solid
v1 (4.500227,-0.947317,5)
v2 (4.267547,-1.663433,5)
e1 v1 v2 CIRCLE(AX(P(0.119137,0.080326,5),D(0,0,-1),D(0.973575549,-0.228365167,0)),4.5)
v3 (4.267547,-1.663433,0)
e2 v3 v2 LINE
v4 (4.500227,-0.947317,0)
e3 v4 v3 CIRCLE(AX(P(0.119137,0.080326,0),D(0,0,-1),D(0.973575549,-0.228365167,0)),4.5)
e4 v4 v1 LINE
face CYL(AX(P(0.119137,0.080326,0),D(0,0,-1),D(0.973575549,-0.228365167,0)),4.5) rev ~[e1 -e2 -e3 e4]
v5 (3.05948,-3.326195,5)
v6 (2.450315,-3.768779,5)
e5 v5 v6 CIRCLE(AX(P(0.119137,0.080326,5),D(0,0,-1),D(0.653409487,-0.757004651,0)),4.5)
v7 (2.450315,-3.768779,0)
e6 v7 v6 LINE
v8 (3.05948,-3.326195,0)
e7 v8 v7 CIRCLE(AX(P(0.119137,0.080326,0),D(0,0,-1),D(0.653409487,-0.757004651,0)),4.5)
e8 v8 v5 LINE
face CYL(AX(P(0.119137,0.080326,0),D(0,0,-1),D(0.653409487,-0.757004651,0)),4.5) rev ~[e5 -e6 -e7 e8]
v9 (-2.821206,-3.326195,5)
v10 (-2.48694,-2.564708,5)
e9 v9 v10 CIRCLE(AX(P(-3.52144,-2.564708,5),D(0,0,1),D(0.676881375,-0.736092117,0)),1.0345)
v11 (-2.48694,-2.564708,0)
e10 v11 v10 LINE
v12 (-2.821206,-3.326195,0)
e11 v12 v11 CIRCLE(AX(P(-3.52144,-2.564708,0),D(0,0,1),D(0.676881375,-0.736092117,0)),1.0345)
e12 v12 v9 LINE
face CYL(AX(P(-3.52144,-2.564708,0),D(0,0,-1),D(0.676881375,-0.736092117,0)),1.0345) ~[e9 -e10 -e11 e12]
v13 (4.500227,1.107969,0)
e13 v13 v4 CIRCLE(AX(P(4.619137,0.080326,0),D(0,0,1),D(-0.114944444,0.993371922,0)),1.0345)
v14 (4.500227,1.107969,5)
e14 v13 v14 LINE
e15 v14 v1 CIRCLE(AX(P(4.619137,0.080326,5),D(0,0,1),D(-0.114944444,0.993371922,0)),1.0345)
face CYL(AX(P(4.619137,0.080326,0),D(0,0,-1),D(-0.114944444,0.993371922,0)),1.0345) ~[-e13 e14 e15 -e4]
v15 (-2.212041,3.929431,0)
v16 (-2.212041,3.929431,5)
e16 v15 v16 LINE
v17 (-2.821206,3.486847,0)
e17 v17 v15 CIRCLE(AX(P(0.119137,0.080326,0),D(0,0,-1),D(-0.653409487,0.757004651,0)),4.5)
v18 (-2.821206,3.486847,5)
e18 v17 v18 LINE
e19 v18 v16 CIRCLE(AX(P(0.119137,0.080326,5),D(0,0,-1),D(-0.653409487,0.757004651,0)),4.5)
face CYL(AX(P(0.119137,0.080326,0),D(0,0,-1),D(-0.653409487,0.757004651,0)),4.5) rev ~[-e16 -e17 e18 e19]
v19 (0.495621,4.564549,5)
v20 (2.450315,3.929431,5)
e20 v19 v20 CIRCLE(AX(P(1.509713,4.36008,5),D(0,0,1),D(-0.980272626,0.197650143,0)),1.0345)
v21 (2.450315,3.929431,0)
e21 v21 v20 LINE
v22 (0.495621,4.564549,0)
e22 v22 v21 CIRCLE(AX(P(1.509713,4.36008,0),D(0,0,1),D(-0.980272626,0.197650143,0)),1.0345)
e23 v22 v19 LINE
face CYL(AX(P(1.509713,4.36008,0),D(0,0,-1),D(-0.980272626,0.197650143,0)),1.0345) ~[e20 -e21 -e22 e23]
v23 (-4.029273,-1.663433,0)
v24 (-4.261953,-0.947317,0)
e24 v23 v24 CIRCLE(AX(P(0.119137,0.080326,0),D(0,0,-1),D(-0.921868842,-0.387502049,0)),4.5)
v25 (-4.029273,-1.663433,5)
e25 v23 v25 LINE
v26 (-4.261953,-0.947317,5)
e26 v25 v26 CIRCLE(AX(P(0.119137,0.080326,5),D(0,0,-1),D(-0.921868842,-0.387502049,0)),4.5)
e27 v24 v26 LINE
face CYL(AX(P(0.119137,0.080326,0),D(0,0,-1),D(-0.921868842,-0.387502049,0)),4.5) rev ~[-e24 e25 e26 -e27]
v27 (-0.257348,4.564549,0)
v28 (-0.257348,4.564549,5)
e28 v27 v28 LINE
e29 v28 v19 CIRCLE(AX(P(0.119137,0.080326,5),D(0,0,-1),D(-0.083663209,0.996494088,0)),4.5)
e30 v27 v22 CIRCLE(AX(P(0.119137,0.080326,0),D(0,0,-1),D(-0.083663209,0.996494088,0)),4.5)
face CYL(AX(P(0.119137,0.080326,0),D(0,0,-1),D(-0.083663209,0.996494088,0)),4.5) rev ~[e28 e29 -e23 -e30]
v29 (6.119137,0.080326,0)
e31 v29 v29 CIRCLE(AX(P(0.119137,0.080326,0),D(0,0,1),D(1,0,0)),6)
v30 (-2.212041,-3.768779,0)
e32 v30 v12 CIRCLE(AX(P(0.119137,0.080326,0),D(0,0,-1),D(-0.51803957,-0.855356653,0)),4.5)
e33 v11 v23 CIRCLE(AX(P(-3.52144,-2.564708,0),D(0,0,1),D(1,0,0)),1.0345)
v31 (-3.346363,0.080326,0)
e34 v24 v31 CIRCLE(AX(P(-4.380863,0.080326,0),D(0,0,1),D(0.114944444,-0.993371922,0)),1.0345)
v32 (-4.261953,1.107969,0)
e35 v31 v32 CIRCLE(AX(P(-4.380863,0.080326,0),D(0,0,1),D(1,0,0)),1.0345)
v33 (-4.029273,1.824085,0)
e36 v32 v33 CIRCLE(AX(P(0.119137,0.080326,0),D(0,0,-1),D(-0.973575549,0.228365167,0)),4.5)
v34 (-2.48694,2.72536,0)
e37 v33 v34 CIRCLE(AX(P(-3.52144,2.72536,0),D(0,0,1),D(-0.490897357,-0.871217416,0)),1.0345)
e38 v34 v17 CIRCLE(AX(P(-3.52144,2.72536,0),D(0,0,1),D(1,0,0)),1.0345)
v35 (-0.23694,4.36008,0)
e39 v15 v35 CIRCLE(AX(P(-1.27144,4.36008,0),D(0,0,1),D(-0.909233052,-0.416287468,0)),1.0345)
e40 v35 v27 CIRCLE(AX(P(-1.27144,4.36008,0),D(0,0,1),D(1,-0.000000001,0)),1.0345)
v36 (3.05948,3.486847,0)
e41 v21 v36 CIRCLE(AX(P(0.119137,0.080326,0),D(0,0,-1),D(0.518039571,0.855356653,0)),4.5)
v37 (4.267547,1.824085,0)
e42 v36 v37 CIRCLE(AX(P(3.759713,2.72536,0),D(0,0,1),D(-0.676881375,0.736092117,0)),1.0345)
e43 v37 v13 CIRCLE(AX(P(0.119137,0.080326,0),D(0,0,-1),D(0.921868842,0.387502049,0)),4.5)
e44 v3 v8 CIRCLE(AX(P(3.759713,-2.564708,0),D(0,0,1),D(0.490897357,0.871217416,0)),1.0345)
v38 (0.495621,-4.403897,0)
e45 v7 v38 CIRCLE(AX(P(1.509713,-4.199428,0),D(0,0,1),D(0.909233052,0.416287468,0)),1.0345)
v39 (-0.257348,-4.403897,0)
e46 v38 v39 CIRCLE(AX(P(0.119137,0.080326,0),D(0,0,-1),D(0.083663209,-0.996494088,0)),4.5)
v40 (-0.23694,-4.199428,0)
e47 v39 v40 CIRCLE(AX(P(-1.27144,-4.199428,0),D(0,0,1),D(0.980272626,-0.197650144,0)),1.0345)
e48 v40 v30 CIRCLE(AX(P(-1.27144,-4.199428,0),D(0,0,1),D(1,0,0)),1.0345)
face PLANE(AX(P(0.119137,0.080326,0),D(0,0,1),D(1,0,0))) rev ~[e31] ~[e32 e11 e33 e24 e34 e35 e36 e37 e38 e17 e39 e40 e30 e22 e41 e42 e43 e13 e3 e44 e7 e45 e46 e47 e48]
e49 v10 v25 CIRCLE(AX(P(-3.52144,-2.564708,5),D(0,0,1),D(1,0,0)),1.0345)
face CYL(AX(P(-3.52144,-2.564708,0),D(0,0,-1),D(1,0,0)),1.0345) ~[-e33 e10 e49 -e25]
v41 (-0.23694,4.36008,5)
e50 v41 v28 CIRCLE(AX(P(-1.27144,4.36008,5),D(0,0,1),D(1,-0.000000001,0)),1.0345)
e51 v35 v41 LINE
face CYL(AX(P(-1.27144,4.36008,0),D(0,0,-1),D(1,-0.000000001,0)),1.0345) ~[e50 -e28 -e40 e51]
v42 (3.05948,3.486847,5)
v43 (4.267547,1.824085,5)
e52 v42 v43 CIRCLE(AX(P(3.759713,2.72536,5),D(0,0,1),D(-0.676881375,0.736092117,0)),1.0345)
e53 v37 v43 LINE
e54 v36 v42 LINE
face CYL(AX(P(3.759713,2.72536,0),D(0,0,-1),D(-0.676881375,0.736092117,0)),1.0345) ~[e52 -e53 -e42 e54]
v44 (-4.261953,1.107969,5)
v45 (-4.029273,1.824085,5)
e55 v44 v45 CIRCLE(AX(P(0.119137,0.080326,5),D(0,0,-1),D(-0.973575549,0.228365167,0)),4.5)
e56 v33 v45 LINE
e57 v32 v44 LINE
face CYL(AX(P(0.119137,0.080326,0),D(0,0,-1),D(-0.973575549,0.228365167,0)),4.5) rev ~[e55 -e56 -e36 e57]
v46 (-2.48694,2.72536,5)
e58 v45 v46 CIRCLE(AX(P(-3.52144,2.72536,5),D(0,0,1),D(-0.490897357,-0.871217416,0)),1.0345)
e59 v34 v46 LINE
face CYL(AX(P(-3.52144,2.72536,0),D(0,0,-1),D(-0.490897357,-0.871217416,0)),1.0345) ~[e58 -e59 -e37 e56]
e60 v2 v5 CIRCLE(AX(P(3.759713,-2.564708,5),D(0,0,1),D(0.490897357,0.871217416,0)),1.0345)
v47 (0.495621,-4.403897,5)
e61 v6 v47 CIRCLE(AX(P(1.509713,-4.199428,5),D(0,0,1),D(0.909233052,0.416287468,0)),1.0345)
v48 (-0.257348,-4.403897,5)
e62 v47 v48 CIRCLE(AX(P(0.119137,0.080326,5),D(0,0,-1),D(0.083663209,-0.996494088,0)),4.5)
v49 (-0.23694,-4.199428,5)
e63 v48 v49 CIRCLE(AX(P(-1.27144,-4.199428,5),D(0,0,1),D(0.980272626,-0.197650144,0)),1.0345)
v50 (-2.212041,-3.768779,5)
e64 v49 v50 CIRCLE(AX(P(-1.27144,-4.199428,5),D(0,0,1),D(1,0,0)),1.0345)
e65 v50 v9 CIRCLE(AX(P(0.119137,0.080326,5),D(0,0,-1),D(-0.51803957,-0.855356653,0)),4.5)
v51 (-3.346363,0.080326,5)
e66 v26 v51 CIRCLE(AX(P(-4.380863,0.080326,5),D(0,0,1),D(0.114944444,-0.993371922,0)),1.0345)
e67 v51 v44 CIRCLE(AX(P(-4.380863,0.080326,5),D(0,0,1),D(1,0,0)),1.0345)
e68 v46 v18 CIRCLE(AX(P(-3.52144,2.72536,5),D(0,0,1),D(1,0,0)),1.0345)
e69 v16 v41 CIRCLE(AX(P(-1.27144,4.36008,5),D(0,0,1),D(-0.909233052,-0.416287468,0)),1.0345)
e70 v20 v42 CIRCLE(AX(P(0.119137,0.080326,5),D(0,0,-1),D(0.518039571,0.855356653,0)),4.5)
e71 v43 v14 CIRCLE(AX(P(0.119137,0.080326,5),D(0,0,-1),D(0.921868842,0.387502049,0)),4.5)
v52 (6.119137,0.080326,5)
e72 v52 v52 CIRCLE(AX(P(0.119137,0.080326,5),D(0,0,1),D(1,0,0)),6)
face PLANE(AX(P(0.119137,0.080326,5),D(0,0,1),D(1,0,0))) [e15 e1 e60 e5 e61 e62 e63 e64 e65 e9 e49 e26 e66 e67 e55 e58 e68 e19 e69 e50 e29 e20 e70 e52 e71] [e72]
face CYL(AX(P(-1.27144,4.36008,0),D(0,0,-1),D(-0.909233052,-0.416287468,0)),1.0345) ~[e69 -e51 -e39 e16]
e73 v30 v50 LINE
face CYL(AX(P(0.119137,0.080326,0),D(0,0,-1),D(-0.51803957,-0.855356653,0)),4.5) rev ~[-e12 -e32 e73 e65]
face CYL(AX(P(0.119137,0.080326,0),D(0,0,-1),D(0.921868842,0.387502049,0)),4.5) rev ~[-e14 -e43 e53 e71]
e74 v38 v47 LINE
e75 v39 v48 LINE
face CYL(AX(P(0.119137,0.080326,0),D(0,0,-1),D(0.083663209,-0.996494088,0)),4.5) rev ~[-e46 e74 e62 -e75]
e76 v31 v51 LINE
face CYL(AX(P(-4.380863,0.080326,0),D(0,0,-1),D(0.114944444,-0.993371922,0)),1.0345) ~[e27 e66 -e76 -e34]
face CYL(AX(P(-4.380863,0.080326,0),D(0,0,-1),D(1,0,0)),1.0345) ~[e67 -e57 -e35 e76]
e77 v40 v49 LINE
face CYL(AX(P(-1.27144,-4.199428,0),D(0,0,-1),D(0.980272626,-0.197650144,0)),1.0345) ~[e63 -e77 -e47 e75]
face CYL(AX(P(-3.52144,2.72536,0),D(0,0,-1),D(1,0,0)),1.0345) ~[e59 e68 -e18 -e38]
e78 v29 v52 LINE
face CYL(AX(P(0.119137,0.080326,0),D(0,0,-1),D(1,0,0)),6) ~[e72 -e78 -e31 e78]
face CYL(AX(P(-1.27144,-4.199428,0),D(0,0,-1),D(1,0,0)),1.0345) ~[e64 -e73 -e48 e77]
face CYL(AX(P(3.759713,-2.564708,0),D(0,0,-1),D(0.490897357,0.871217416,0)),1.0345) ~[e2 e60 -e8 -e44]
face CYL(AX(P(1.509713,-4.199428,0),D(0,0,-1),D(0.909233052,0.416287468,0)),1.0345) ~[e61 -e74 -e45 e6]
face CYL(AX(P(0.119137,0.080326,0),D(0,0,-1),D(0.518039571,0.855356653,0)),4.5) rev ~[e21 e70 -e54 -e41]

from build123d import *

# Parameters (mm, degrees)
F0_R     = 6
F1_DEPTH = 5


with BuildPart() as f1:
    # F0 (on Top) → F1 (new body)
    with BuildSketch(Plane.XY):
        with Locations((0.1191368553, 0.0803260972)):
            Circle(F0_R)
        with BuildLine():
            ThreePointArc((4.2675466454, 1.8240853161), (4.3988911787, 1.4709025719), (4.5002268275, 1.1079693501))
            ThreePointArc((4.5002268275, 1.1079693501), (5.3073148215, 0.8527258233), (5.6536368553, 0.0803260972))
            ThreePointArc((5.6536368553, 0.0803260972), (5.3073148215, -0.6920736289), (4.5002268275, -0.9473171557))
            ThreePointArc((4.5002268275, -0.9473171557), (4.3988911787, -1.3102503775), (4.2675466454, -1.6634331217))
            ThreePointArc((4.2675466454, -1.6634331217), (4.6528941109, -2.0427704321), (4.79421333, -2.5647075381))
            ThreePointArc((4.79421333, -2.5647075381), (4.1755248273, -3.5119620175), (3.059479548, -3.3261948332))
            ThreePointArc((3.059479548, -3.3261948332), (2.7641704906, -3.5602503775), (2.4503149228, -3.76877884))
            ThreePointArc((2.4503149228, -3.76877884), (2.5204661677, -3.9790445807), (2.54421333, -4.1994282261))
            ThreePointArc((2.54421333, -4.1994282261), (1.6124558319, -5.2288135905), (0.4956212985, -4.4038972987))
            ThreePointArc((0.4956212985, -4.4038972987), (0.1191368553, -4.4196739028), (-0.2573475879, -4.4038972987))
            ThreePointArc((-0.2573475879, -4.4038972987), (-1.5911177, -5.1832961922), (-2.2120412121, -3.76877884))
            ThreePointArc((-2.2120412121, -3.76877884), (-2.52589678, -3.5602503775), (-2.8212058374, -3.3261948332))
            ThreePointArc((-2.8212058374, -3.3261948332), (-4.3583677, -3.1727713816), (-4.0292729348, -1.6634331217))
            ThreePointArc((-4.0292729348, -1.6634331217), (-4.160617468, -1.3102503775), (-4.2619531169, -0.9473171557))
            ThreePointArc((-4.2619531169, -0.9473171557), (-5.4153631447, 0.0803260972), (-4.2619531169, 1.1079693501))
            ThreePointArc((-4.2619531169, 1.1079693501), (-4.160617468, 1.4709025719), (-4.0292729348, 1.8240853161))
            ThreePointArc((-4.0292729348, 1.8240853161), (-4.3583677, 3.333423576), (-2.8212058374, 3.4868470276))
            ThreePointArc((-2.8212058374, 3.4868470276), (-2.52589678, 3.7209025719), (-2.2120412121, 3.9294310345))
            ThreePointArc((-2.2120412121, 3.9294310345), (-1.5911177, 5.3439483866), (-0.2573475879, 4.5645494931))
            ThreePointArc((-0.2573475879, 4.5645494931), (0.1191368553, 4.5803260972), (0.4956212985, 4.5645494931))
            ThreePointArc((0.4956212985, 4.5645494931), (1.6124558319, 5.3894657849), (2.54421333, 4.3600804205))
            ThreePointArc((2.54421333, 4.3600804205), (2.5204661677, 4.1396967751), (2.4503149228, 3.9294310345))
            ThreePointArc((2.4503149228, 3.9294310345), (2.7641704906, 3.7209025719), (3.059479548, 3.4868470276))
            ThreePointArc((3.059479548, 3.4868470276), (4.1755248273, 3.6726142119), (4.79421333, 2.7253597325))
            ThreePointArc((4.79421333, 2.7253597325), (4.6528941109, 2.2034226265), (4.2675466454, 1.8240853161))
        make_face(mode=Mode.SUBTRACT)
        with BuildLine():
            ThreePointArc((4.5002268275, -0.9473171557), (4.5893105027, -0.4369239028), (4.6191368553, 0.0803260972))
            ThreePointArc((4.6191368553, 0.0803260972), (4.5893105027, 0.5975760972), (4.5002268275, 1.1079693501))
            ThreePointArc((4.5002268275, 1.1079693501), (3.5846368553, 0.0803260972), (4.5002268275, -0.9473171557))
        make_face()
        with BuildLine():
            ThreePointArc((4.5002268275, 1.1079693501), (4.5893105027, 0.5975760972), (4.6191368553, 0.0803260972))
            ThreePointArc((4.6191368553, 0.0803260972), (4.5893105027, -0.4369239028), (4.5002268275, -0.9473171557))
            ThreePointArc((4.5002268275, -0.9473171557), (5.3073148215, -0.6920736289), (5.6536368553, 0.0803260972))
            ThreePointArc((5.6536368553, 0.0803260972), (5.3073148215, 0.8527258233), (4.5002268275, 1.1079693501))
        make_face()
        with BuildLine():
            ThreePointArc((3.059479548, 3.4868470276), (2.9227852493, 2.117295889), (4.2675466454, 1.8240853161))
            ThreePointArc((4.2675466454, 1.8240853161), (3.75971333, 2.7253597325), (3.059479548, 3.4868470276))
        make_face()
        with BuildLine():
            ThreePointArc((3.059479548, 3.4868470276), (3.75971333, 2.7253597325), (4.2675466454, 1.8240853161))
            ThreePointArc((4.2675466454, 1.8240853161), (4.6528941109, 2.2034226265), (4.79421333, 2.7253597325))
            ThreePointArc((4.79421333, 2.7253597325), (4.1755248273, 3.6726142119), (3.059479548, 3.4868470276))
        make_face()
        with BuildLine():
            ThreePointArc((4.79421333, -2.5647075381), (4.6528941109, -2.0427704321), (4.2675466454, -1.6634331217))
            ThreePointArc((4.2675466454, -1.6634331217), (3.75971333, -2.5647075381), (3.059479548, -3.3261948332))
            ThreePointArc((3.059479548, -3.3261948332), (4.1755248273, -3.5119620175), (4.79421333, -2.5647075381))
        make_face()
        with BuildLine():
            ThreePointArc((3.059479548, -3.3261948332), (3.75971333, -2.5647075381), (4.2675466454, -1.6634331217))
            ThreePointArc((4.2675466454, -1.6634331217), (2.9227852493, -1.9566436946), (3.059479548, -3.3261948332))
        make_face()
        with BuildLine():
            ThreePointArc((0.4956212985, 4.5645494931), (1.1900352493, 3.3762124544), (2.4503149228, 3.9294310345))
            ThreePointArc((2.4503149228, 3.9294310345), (1.50971333, 4.3600804205), (0.4956212985, 4.5645494931))
        make_face()
        with BuildLine():
            ThreePointArc((0.4956212985, 4.5645494931), (1.50971333, 4.3600804205), (2.4503149228, 3.9294310345))
            ThreePointArc((2.4503149228, 3.9294310345), (2.5204661677, 4.1396967751), (2.54421333, 4.3600804205))
            ThreePointArc((2.54421333, 4.3600804205), (1.6124558319, 5.3894657849), (0.4956212985, 4.5645494931))
        make_face()
        with BuildLine():
            ThreePointArc((2.54421333, -4.1994282261), (2.5204661677, -3.9790445807), (2.4503149228, -3.76877884))
            ThreePointArc((2.4503149228, -3.76877884), (1.50971333, -4.1994282261), (0.4956212985, -4.4038972987))
            ThreePointArc((0.4956212985, -4.4038972987), (1.6124558319, -5.2288135905), (2.54421333, -4.1994282261))
        make_face()
        with BuildLine():
            ThreePointArc((0.4956212985, -4.4038972987), (1.50971333, -4.1994282261), (2.4503149228, -3.76877884))
            ThreePointArc((2.4503149228, -3.76877884), (1.1900352493, -3.21556026), (0.4956212985, -4.4038972987))
        make_face()
        with BuildLine():
            ThreePointArc((-0.2369396194, 4.3600804205), (-0.242054255, 4.4628229225), (-0.2573475879, 4.5645494931))
            ThreePointArc((-0.2573475879, 4.5645494931), (-1.2714396194, 4.3600804205), (-2.2120412121, 3.9294310345))
            ThreePointArc((-2.2120412121, 3.9294310345), (-1.051055974, 3.3493275829), (-0.2369396194, 4.3600804205))
        make_face()
        with BuildLine():
            ThreePointArc((-2.2120412121, 3.9294310345), (-1.2714396194, 4.3600804205), (-0.2573475879, 4.5645494931))
            ThreePointArc((-0.2573475879, 4.5645494931), (-1.5911177, 5.3439483866), (-2.2120412121, 3.9294310345))
        make_face()
        with BuildLine():
            ThreePointArc((-2.2120412121, -3.76877884), (-1.5911177, -5.1832961922), (-0.2573475879, -4.4038972987))
            ThreePointArc((-0.2573475879, -4.4038972987), (-1.2714396194, -4.1994282261), (-2.2120412121, -3.76877884))
        make_face()
        with BuildLine():
            ThreePointArc((-2.2120412121, -3.76877884), (-1.2714396194, -4.1994282261), (-0.2573475879, -4.4038972987))
            ThreePointArc((-0.2573475879, -4.4038972987), (-0.242054255, -4.302170728), (-0.2369396194, -4.1994282261))
            ThreePointArc((-0.2369396194, -4.1994282261), (-1.051055974, -3.1886753885), (-2.2120412121, -3.76877884))
        make_face()
        with BuildLine():
            ThreePointArc((-2.4869396194, 2.7253597325), (-2.57418514, 3.1411712298), (-2.8212058374, 3.4868470276))
            ThreePointArc((-2.8212058374, 3.4868470276), (-3.5214396194, 2.7253597325), (-4.0292729348, 1.8240853161))
            ThreePointArc((-4.0292729348, 1.8240853161), (-2.9995025134, 1.8321789516), (-2.4869396194, 2.7253597325))
        make_face()
        with BuildLine():
            ThreePointArc((-4.0292729348, 1.8240853161), (-3.5214396194, 2.7253597325), (-2.8212058374, 3.4868470276))
            ThreePointArc((-2.8212058374, 3.4868470276), (-4.3583677, 3.333423576), (-4.0292729348, 1.8240853161))
        make_face()
        with BuildLine():
            ThreePointArc((-4.0292729348, -1.6634331217), (-4.3583677, -3.1727713816), (-2.8212058374, -3.3261948332))
            ThreePointArc((-2.8212058374, -3.3261948332), (-3.5214396194, -2.5647075381), (-4.0292729348, -1.6634331217))
        make_face()
        with BuildLine():
            ThreePointArc((-4.0292729348, -1.6634331217), (-3.5214396194, -2.5647075381), (-2.8212058374, -3.3261948332))
            ThreePointArc((-2.8212058374, -3.3261948332), (-2.57418514, -2.9805190354), (-2.4869396194, -2.5647075381))
            ThreePointArc((-2.4869396194, -2.5647075381), (-2.9995025134, -1.6715267572), (-4.0292729348, -1.6634331217))
        make_face()
        with BuildLine():
            ThreePointArc((-3.3463631447, 0.0803260972), (-3.6084634186, 0.7685040634), (-4.2619531169, 1.1079693501))
            ThreePointArc((-4.2619531169, 1.1079693501), (-4.3808631447, 0.0803260972), (-4.2619531169, -0.9473171557))
            ThreePointArc((-4.2619531169, -0.9473171557), (-3.6084634186, -0.607851869), (-3.3463631447, 0.0803260972))
        make_face()
        with BuildLine():
            ThreePointArc((-4.2619531169, -0.9473171557), (-4.3808631447, 0.0803260972), (-4.2619531169, 1.1079693501))
            ThreePointArc((-4.2619531169, 1.1079693501), (-5.4153631447, 0.0803260972), (-4.2619531169, -0.9473171557))
        make_face()
    extrude(amount=F1_DEPTH)


solid = f1.part
